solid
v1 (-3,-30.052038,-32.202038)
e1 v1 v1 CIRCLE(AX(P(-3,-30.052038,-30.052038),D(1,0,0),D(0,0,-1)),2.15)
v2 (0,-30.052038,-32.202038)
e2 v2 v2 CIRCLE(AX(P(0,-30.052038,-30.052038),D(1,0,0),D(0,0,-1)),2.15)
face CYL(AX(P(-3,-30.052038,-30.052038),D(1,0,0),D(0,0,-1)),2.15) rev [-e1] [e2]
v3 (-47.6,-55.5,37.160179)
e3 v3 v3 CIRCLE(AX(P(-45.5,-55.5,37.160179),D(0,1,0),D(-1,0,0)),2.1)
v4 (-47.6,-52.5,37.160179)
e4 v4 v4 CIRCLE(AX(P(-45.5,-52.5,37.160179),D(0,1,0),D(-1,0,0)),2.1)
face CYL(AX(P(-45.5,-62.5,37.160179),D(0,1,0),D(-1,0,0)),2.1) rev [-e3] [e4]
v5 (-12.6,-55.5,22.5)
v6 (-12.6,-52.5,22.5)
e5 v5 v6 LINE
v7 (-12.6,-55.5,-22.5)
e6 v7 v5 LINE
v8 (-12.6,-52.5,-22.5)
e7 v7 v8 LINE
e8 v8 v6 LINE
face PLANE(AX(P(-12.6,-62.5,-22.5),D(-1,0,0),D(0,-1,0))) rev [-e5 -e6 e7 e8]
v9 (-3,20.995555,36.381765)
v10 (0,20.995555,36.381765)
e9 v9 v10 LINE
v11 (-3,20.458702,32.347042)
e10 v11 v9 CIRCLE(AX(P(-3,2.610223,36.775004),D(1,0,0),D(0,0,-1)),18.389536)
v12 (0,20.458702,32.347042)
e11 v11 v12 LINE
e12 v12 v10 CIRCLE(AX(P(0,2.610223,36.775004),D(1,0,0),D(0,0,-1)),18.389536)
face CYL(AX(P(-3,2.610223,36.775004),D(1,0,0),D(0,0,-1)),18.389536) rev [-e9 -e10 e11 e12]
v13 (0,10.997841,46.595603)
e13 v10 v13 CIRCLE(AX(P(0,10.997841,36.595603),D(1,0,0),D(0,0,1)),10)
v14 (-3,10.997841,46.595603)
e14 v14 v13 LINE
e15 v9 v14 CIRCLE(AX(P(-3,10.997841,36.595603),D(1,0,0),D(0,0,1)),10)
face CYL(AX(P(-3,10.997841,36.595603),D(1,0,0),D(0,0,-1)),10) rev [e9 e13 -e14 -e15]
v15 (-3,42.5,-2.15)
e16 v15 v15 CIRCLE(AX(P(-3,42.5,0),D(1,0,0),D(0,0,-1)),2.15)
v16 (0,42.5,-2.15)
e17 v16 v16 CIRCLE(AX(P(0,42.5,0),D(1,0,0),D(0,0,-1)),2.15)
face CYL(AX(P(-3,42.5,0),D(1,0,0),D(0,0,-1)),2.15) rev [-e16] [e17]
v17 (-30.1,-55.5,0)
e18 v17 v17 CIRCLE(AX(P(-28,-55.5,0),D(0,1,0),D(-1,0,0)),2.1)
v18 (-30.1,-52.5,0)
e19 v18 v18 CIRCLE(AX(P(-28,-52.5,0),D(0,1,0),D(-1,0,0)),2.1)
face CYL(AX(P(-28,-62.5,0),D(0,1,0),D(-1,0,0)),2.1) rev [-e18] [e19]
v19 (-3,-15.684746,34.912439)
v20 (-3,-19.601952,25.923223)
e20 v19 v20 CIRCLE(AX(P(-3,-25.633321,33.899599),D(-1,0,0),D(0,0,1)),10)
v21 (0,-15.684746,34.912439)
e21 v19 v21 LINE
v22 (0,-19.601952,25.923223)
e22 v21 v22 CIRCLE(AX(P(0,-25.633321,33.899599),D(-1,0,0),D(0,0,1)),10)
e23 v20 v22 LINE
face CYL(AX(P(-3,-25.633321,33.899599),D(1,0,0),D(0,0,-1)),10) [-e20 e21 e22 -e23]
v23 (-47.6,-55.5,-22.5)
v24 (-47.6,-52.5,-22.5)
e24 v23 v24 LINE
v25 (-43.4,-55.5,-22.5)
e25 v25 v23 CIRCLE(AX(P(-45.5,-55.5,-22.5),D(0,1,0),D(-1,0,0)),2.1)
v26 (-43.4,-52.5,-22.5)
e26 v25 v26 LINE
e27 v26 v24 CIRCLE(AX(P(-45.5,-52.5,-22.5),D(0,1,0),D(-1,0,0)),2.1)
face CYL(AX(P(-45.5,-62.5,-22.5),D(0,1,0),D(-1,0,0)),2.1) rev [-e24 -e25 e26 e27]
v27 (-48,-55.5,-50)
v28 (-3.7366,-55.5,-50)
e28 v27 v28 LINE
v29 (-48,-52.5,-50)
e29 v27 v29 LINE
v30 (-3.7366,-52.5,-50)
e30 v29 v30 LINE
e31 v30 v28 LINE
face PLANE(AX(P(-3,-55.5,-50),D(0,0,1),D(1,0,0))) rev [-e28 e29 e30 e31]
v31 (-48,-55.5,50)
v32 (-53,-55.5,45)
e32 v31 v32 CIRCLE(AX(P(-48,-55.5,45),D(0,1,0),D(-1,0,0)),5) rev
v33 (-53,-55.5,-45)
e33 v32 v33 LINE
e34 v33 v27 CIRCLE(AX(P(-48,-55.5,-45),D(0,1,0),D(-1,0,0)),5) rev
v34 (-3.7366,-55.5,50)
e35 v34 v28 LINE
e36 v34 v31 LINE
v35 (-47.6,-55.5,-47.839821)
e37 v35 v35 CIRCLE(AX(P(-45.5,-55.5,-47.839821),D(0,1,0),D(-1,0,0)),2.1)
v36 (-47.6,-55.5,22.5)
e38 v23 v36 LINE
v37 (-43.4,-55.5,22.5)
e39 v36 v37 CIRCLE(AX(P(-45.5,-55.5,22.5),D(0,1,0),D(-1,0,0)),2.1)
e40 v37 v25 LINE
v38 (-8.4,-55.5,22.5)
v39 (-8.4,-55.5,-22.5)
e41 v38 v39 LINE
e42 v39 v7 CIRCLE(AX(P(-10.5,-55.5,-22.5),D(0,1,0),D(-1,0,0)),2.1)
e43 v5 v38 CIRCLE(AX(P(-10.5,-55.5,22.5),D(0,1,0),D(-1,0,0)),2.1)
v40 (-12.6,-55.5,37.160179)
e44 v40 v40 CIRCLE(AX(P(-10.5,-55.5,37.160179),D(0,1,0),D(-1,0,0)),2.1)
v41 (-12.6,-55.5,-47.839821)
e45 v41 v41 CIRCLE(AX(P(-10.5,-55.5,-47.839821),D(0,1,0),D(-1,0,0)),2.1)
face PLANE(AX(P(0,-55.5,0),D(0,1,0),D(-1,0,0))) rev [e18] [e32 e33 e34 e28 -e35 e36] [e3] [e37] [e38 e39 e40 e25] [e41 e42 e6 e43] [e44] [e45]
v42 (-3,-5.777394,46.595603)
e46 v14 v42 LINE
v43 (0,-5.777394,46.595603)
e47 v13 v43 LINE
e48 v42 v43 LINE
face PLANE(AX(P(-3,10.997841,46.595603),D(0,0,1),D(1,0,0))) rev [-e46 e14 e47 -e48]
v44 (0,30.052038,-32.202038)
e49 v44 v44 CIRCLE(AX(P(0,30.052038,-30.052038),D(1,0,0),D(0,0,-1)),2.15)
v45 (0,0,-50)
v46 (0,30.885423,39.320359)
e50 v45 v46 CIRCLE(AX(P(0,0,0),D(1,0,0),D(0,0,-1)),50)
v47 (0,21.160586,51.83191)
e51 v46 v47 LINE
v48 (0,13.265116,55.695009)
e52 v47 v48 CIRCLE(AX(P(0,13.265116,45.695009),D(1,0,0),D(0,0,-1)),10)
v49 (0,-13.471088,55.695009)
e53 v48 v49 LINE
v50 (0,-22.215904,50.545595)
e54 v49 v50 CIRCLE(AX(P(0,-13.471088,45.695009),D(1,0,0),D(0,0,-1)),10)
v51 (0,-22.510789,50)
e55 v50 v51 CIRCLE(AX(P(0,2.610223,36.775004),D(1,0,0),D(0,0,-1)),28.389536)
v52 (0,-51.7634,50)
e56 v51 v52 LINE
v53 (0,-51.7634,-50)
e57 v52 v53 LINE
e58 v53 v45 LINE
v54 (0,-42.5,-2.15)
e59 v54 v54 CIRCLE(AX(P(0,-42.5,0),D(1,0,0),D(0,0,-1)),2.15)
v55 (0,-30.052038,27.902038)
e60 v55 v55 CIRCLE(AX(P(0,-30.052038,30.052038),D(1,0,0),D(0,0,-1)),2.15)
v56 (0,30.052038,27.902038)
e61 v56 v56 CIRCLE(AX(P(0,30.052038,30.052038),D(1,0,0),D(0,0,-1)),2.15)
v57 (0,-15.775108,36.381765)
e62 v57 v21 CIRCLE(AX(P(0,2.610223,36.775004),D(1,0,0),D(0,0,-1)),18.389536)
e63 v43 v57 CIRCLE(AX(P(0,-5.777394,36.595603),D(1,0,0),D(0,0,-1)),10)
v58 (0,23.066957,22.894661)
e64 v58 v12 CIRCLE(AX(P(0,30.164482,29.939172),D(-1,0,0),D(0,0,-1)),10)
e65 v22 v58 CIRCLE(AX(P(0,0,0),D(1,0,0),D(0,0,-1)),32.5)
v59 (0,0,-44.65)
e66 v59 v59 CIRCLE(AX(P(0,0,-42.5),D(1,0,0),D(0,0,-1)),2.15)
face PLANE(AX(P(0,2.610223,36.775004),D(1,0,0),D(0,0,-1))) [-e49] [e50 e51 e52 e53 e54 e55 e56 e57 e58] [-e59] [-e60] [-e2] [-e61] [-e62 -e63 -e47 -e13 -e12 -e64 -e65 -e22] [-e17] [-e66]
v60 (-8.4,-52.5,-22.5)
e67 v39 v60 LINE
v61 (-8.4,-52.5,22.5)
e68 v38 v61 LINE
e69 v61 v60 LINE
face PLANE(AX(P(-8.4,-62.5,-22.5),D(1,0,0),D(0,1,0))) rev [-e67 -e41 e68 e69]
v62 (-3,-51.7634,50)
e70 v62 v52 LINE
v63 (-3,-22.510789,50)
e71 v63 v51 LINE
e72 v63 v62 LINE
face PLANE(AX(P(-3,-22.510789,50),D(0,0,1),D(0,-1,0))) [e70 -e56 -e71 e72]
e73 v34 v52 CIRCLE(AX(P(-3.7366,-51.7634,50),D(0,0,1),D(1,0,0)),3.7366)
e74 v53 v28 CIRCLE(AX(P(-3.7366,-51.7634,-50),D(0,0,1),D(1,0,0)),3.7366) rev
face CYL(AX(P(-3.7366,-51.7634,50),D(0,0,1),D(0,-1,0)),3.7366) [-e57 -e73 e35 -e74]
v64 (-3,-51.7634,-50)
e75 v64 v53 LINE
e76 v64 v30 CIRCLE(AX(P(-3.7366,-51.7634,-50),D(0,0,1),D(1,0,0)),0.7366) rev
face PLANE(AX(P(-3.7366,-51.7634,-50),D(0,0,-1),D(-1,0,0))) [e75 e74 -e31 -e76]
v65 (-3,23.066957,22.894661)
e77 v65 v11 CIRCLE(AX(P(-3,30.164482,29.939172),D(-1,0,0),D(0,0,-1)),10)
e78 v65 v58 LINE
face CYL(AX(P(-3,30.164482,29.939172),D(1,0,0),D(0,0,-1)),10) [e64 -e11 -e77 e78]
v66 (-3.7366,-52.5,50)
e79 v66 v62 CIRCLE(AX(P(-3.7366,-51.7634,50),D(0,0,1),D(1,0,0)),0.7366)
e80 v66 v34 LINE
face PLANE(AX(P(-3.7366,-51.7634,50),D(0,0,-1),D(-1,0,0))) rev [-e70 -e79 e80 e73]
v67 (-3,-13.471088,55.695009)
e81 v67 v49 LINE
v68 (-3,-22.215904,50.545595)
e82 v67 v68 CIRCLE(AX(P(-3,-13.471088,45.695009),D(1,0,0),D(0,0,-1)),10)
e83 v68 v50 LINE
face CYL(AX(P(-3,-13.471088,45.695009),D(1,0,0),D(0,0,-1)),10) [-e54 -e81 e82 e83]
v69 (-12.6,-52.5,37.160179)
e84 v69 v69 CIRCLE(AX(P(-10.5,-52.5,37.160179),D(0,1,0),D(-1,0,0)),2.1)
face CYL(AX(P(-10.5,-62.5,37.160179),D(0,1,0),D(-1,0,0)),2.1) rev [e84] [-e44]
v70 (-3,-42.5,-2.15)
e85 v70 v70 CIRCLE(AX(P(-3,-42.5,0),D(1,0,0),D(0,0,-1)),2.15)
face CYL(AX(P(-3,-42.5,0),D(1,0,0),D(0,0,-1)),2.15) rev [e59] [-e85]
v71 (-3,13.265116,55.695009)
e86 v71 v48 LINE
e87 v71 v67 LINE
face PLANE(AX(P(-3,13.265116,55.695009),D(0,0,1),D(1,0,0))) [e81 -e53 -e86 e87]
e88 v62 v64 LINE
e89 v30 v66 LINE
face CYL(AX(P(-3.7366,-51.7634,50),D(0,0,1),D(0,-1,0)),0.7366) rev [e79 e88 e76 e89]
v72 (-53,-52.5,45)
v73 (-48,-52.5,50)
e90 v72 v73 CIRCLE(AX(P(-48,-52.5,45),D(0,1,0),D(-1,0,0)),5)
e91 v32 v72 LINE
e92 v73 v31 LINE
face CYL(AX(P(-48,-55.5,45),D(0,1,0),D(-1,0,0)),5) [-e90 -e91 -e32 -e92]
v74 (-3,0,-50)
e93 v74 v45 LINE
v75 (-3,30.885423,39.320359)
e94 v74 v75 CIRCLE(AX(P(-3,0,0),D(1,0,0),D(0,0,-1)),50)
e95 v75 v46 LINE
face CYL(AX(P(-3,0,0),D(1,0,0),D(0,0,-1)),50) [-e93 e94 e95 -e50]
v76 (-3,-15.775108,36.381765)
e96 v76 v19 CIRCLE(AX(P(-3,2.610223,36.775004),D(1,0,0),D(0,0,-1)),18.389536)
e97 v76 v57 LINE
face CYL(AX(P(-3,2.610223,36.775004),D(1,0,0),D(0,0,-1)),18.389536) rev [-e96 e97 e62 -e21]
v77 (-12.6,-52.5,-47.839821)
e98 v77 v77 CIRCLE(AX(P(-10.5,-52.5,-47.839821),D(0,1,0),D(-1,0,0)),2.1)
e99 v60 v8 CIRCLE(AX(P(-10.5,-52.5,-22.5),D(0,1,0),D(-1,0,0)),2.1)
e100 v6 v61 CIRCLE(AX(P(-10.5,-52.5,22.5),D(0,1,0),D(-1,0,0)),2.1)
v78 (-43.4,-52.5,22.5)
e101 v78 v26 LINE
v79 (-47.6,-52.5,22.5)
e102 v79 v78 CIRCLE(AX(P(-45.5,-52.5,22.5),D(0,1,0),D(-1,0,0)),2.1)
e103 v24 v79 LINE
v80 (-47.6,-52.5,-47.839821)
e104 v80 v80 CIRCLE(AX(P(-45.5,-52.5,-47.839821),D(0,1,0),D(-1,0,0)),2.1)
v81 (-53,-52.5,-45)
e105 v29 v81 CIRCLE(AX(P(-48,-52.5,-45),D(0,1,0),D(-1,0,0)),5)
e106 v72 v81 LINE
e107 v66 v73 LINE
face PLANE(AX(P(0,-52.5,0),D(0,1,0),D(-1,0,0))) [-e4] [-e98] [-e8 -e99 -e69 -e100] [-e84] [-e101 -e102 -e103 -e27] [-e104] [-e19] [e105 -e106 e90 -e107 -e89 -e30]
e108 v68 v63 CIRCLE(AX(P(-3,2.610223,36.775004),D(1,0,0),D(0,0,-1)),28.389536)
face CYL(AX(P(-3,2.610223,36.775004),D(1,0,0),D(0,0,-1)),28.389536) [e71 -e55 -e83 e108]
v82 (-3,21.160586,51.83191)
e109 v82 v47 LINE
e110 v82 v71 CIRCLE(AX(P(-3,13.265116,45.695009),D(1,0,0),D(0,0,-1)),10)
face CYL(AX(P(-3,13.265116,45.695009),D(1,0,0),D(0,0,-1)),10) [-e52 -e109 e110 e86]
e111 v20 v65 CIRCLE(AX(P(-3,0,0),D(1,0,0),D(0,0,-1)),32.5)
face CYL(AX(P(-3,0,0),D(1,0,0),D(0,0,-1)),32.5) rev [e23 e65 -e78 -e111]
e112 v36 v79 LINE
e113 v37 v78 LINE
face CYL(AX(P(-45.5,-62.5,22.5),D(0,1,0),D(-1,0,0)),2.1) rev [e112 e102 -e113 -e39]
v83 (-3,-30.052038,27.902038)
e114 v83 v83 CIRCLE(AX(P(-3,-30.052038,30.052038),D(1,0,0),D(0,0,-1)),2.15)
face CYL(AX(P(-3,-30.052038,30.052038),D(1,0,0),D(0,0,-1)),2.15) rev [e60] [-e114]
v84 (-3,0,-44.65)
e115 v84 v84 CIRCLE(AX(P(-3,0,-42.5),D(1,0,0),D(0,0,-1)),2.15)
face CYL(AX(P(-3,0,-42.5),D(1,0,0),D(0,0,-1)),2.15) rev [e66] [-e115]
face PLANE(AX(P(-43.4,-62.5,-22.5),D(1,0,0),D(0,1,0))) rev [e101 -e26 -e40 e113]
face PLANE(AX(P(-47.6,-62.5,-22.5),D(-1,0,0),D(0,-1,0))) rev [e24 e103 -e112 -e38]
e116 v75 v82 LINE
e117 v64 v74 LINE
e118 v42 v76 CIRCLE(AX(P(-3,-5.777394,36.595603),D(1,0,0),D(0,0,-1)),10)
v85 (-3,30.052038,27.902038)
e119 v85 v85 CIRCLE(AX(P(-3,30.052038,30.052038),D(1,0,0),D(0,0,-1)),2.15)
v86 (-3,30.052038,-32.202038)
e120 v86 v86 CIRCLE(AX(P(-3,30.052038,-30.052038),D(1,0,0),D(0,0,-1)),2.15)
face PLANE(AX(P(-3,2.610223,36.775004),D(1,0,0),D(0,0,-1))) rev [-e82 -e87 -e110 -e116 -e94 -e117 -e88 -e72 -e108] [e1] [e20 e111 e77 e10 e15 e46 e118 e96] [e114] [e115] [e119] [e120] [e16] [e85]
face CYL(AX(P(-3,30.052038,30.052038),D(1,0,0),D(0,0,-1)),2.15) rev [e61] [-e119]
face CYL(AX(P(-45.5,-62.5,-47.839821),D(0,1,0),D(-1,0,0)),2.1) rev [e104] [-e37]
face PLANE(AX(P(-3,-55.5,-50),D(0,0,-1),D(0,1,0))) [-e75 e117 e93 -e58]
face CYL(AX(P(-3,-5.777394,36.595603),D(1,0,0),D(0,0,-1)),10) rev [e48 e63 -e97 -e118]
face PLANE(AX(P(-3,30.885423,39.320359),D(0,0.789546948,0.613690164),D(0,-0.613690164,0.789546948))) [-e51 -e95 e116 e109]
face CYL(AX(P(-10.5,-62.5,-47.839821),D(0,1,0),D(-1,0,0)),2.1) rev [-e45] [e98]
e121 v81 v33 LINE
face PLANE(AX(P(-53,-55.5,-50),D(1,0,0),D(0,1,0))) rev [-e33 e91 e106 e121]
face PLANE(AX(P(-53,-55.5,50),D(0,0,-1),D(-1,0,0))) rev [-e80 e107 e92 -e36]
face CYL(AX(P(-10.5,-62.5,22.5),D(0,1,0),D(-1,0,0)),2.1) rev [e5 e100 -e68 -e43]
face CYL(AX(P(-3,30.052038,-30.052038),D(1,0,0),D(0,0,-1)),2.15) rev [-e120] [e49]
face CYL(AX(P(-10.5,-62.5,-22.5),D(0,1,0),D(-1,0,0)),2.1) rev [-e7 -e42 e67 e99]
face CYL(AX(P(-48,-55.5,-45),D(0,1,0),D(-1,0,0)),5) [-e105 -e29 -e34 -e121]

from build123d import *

# Parameters (mm, degrees)
SKETCH_1_R                       = 2.15
SM_BASE_FLANGE_1_DEPTH           = 3
SM_EDGE_FLANGE_1_STRIP_W         = 13.4732
SM_EDGE_FLANGE_1_STRIP_H         = 3
SM_EDGE_FLANGE_1_STRIP_CUT_DEPTH = 100
SM_EDGE_FLANGE_1_DEPTH           = 100
SKETCH_9_R                       = 2.1
CUT_EXTRUDE_1_DEPTH              = 10
FILLET_1_R                       = 5
SKETCH_10_R                      = 2.1
CUT_EXTRUDE_2_DEPTH              = 10


# Sheet-metal steps are written as plain solids
with BuildPart() as part:
    # Sketch 1 → 基体-法兰1 (new body)
    with BuildSketch(Plane(origin=(0, 0, 0), x_dir=(0, 0, -1), z_dir=(1, 0, 0))):
        with BuildLine():
            Line((-50, -22.510788707), (-50, -55.5))
            Line((-50, -55.5), (50, -55.5))
            Line((50, -55.5), (50, 0))
            ThreePointArc((50, 0), (16.339860062, 47.254724348), (-39.320358927, 30.885423324))
            Line((-39.320358927, 30.885423324), (-51.83191014, 21.160585638))
            ThreePointArc((-51.83191014, 21.160585638), (-54.677464079, 17.660055501), (-55.695008503, 13.265116159))
            Line((-55.695008503, 13.265116159), (-55.695008503, -13.471087591))
            ThreePointArc((-55.695008503, -13.471087591), (-54.312022765, -18.545244191), (-50.545595463, -22.215903549))
            ThreePointArc((-50.545595463, -22.215903549), (-50.273602999, -22.364836031), (-50, -22.510788707))
        make_face()
        with Locations((0, 42.5)):
            Circle(SKETCH_1_R, mode=Mode.SUBTRACT)
        with Locations((30.0520382, 30.0520382)):
            Circle(SKETCH_1_R, mode=Mode.SUBTRACT)
        with Locations((42.5, 0)):
            Circle(SKETCH_1_R, mode=Mode.SUBTRACT)
        with Locations((30.0520382, -30.0520382)):
            Circle(SKETCH_1_R, mode=Mode.SUBTRACT)
        with Locations((0, -42.5)):
            Circle(SKETCH_1_R, mode=Mode.SUBTRACT)
        with Locations((-30.0520382, -30.0520382)):
            Circle(SKETCH_1_R, mode=Mode.SUBTRACT)
        with Locations((-30.0520382, 30.0520382)):
            Circle(SKETCH_1_R, mode=Mode.SUBTRACT)
        with BuildLine():
            Line((-46.595603285, 10.997841176), (-46.595603285, -5.777394466))
            ThreePointArc((-46.595603285, -5.777394466), (-43.590659136, -12.923665777), (-36.381764555, -15.775107854))
            ThreePointArc((-36.381764555, -15.775107854), (-35.646197226, -15.744635296), (-34.912439019, -15.684745692))
            ThreePointArc((-34.912439019, -15.684745692), (-29.904748182, -16.465924493), (-25.923223086, -19.601951556))
            ThreePointArc((-25.923223086, -19.601951556), (32.418442092, -2.301002457), (-22.894661052, 23.066956784))
            ThreePointArc((-22.894661052, 23.066956784), (-27.279217704, 20.524739091), (-32.347042381, 20.45870218))
            ThreePointArc((-32.347042381, 20.45870218), (-34.349504558, 20.839101356), (-36.381764555, 20.995554565))
            ThreePointArc((-36.381764555, 20.995554565), (-43.590659136, 18.144112487), (-46.595603285, 10.997841176))
        make_face(mode=Mode.SUBTRACT)
    extrude(amount=-SM_BASE_FLANGE_1_DEPTH)

    # 边线-法兰1 strip (across the edge) → 边线-法兰1 strip cut (cut)
    with BuildSketch(Plane(origin=(-3, -55.5, -50), x_dir=(0, 1, 0), z_dir=(0, 0, 1))):
        with Locations((-3, -1.5)):
            Rectangle(SM_EDGE_FLANGE_1_STRIP_W, SM_EDGE_FLANGE_1_STRIP_H)
    extrude(amount=SM_EDGE_FLANGE_1_STRIP_CUT_DEPTH, mode=Mode.SUBTRACT)

    # 边线-法兰1 section (across the edge) → 边线-法兰1 (add)
    with BuildSketch(Plane(origin=(-3, -55.5, -50), x_dir=(0, 1, 0), z_dir=(0, 0, 1))):
        with BuildLine():
            Line((0, 0.7366), (0, 50))
            Line((0, 50), (3, 50))
            Line((3, 50), (3, 0.7366))
            ThreePointArc((3, 0.7366), (3.215745145, 0.215745145), (3.7366, 0))
            Line((3.7366, 0), (3.7366, -3))
            ThreePointArc((3.7366, -3), (1.094424801, -1.905575199), (0, 0.7366))
        make_face()
    extrude(amount=SM_EDGE_FLANGE_1_DEPTH)

    # 草图9 → 切除-拉伸1 (cut)
    with BuildSketch(Plane(origin=(0, -52.5, 0), x_dir=(1, 0, 0), z_dir=(0, 1, 0))):
        with Locations(Location((-45.5, 47.839820537, 0), (0, 0, 180))):
            Circle(SKETCH_9_R)
        with Locations(Location((-10.5, 47.839820537, 0), (0, 0, 180))):
            Circle(SKETCH_9_R)
        with Locations(Location((-45.5, -37.160179463, 0), (0, 0, 180))):
            Circle(SKETCH_9_R)
        with Locations(Location((-10.5, -37.160179463, 0), (0, 0, 180))):
            Circle(SKETCH_9_R)
    extrude(amount=-CUT_EXTRUDE_1_DEPTH, mode=Mode.SUBTRACT)

    # 圆角1
    fillet_1_edges = [part.edges().sort_by_distance(p)[0] for p in [
        (-53, -54, -50),
        (-53, -54, 50),
    ]]
    fillet(fillet_1_edges, radius=FILLET_1_R)

    # 草图10 → 切除-拉伸2 (cut)
    with BuildSketch(Plane(origin=(0, -52.5, 0), x_dir=(1, 0, 0), z_dir=(0, 1, 0))):
        with Locations(Location((-28, 0, 0), (0, 0, 180))):
            Circle(SKETCH_10_R)
        with BuildLine():
            Line((-43.4, 22.5), (-43.4, -22.5))
            ThreePointArc((-43.4, -22.5), (-45.5, -24.6), (-47.6, -22.5))
            Line((-47.6, -22.5), (-47.6, 22.5))
            ThreePointArc((-47.6, 22.5), (-45.5, 24.6), (-43.4, 22.5))
        make_face()
        with BuildLine():
            Line((-8.4, 22.5), (-8.4, -22.5))
            ThreePointArc((-8.4, -22.5), (-10.5, -24.6), (-12.6, -22.5))
            Line((-12.6, -22.5), (-12.6, 22.5))
            ThreePointArc((-12.6, 22.5), (-10.5, 24.6), (-8.4, 22.5))
        make_face()
    extrude(amount=-CUT_EXTRUDE_2_DEPTH, mode=Mode.SUBTRACT)


solid = part.part
